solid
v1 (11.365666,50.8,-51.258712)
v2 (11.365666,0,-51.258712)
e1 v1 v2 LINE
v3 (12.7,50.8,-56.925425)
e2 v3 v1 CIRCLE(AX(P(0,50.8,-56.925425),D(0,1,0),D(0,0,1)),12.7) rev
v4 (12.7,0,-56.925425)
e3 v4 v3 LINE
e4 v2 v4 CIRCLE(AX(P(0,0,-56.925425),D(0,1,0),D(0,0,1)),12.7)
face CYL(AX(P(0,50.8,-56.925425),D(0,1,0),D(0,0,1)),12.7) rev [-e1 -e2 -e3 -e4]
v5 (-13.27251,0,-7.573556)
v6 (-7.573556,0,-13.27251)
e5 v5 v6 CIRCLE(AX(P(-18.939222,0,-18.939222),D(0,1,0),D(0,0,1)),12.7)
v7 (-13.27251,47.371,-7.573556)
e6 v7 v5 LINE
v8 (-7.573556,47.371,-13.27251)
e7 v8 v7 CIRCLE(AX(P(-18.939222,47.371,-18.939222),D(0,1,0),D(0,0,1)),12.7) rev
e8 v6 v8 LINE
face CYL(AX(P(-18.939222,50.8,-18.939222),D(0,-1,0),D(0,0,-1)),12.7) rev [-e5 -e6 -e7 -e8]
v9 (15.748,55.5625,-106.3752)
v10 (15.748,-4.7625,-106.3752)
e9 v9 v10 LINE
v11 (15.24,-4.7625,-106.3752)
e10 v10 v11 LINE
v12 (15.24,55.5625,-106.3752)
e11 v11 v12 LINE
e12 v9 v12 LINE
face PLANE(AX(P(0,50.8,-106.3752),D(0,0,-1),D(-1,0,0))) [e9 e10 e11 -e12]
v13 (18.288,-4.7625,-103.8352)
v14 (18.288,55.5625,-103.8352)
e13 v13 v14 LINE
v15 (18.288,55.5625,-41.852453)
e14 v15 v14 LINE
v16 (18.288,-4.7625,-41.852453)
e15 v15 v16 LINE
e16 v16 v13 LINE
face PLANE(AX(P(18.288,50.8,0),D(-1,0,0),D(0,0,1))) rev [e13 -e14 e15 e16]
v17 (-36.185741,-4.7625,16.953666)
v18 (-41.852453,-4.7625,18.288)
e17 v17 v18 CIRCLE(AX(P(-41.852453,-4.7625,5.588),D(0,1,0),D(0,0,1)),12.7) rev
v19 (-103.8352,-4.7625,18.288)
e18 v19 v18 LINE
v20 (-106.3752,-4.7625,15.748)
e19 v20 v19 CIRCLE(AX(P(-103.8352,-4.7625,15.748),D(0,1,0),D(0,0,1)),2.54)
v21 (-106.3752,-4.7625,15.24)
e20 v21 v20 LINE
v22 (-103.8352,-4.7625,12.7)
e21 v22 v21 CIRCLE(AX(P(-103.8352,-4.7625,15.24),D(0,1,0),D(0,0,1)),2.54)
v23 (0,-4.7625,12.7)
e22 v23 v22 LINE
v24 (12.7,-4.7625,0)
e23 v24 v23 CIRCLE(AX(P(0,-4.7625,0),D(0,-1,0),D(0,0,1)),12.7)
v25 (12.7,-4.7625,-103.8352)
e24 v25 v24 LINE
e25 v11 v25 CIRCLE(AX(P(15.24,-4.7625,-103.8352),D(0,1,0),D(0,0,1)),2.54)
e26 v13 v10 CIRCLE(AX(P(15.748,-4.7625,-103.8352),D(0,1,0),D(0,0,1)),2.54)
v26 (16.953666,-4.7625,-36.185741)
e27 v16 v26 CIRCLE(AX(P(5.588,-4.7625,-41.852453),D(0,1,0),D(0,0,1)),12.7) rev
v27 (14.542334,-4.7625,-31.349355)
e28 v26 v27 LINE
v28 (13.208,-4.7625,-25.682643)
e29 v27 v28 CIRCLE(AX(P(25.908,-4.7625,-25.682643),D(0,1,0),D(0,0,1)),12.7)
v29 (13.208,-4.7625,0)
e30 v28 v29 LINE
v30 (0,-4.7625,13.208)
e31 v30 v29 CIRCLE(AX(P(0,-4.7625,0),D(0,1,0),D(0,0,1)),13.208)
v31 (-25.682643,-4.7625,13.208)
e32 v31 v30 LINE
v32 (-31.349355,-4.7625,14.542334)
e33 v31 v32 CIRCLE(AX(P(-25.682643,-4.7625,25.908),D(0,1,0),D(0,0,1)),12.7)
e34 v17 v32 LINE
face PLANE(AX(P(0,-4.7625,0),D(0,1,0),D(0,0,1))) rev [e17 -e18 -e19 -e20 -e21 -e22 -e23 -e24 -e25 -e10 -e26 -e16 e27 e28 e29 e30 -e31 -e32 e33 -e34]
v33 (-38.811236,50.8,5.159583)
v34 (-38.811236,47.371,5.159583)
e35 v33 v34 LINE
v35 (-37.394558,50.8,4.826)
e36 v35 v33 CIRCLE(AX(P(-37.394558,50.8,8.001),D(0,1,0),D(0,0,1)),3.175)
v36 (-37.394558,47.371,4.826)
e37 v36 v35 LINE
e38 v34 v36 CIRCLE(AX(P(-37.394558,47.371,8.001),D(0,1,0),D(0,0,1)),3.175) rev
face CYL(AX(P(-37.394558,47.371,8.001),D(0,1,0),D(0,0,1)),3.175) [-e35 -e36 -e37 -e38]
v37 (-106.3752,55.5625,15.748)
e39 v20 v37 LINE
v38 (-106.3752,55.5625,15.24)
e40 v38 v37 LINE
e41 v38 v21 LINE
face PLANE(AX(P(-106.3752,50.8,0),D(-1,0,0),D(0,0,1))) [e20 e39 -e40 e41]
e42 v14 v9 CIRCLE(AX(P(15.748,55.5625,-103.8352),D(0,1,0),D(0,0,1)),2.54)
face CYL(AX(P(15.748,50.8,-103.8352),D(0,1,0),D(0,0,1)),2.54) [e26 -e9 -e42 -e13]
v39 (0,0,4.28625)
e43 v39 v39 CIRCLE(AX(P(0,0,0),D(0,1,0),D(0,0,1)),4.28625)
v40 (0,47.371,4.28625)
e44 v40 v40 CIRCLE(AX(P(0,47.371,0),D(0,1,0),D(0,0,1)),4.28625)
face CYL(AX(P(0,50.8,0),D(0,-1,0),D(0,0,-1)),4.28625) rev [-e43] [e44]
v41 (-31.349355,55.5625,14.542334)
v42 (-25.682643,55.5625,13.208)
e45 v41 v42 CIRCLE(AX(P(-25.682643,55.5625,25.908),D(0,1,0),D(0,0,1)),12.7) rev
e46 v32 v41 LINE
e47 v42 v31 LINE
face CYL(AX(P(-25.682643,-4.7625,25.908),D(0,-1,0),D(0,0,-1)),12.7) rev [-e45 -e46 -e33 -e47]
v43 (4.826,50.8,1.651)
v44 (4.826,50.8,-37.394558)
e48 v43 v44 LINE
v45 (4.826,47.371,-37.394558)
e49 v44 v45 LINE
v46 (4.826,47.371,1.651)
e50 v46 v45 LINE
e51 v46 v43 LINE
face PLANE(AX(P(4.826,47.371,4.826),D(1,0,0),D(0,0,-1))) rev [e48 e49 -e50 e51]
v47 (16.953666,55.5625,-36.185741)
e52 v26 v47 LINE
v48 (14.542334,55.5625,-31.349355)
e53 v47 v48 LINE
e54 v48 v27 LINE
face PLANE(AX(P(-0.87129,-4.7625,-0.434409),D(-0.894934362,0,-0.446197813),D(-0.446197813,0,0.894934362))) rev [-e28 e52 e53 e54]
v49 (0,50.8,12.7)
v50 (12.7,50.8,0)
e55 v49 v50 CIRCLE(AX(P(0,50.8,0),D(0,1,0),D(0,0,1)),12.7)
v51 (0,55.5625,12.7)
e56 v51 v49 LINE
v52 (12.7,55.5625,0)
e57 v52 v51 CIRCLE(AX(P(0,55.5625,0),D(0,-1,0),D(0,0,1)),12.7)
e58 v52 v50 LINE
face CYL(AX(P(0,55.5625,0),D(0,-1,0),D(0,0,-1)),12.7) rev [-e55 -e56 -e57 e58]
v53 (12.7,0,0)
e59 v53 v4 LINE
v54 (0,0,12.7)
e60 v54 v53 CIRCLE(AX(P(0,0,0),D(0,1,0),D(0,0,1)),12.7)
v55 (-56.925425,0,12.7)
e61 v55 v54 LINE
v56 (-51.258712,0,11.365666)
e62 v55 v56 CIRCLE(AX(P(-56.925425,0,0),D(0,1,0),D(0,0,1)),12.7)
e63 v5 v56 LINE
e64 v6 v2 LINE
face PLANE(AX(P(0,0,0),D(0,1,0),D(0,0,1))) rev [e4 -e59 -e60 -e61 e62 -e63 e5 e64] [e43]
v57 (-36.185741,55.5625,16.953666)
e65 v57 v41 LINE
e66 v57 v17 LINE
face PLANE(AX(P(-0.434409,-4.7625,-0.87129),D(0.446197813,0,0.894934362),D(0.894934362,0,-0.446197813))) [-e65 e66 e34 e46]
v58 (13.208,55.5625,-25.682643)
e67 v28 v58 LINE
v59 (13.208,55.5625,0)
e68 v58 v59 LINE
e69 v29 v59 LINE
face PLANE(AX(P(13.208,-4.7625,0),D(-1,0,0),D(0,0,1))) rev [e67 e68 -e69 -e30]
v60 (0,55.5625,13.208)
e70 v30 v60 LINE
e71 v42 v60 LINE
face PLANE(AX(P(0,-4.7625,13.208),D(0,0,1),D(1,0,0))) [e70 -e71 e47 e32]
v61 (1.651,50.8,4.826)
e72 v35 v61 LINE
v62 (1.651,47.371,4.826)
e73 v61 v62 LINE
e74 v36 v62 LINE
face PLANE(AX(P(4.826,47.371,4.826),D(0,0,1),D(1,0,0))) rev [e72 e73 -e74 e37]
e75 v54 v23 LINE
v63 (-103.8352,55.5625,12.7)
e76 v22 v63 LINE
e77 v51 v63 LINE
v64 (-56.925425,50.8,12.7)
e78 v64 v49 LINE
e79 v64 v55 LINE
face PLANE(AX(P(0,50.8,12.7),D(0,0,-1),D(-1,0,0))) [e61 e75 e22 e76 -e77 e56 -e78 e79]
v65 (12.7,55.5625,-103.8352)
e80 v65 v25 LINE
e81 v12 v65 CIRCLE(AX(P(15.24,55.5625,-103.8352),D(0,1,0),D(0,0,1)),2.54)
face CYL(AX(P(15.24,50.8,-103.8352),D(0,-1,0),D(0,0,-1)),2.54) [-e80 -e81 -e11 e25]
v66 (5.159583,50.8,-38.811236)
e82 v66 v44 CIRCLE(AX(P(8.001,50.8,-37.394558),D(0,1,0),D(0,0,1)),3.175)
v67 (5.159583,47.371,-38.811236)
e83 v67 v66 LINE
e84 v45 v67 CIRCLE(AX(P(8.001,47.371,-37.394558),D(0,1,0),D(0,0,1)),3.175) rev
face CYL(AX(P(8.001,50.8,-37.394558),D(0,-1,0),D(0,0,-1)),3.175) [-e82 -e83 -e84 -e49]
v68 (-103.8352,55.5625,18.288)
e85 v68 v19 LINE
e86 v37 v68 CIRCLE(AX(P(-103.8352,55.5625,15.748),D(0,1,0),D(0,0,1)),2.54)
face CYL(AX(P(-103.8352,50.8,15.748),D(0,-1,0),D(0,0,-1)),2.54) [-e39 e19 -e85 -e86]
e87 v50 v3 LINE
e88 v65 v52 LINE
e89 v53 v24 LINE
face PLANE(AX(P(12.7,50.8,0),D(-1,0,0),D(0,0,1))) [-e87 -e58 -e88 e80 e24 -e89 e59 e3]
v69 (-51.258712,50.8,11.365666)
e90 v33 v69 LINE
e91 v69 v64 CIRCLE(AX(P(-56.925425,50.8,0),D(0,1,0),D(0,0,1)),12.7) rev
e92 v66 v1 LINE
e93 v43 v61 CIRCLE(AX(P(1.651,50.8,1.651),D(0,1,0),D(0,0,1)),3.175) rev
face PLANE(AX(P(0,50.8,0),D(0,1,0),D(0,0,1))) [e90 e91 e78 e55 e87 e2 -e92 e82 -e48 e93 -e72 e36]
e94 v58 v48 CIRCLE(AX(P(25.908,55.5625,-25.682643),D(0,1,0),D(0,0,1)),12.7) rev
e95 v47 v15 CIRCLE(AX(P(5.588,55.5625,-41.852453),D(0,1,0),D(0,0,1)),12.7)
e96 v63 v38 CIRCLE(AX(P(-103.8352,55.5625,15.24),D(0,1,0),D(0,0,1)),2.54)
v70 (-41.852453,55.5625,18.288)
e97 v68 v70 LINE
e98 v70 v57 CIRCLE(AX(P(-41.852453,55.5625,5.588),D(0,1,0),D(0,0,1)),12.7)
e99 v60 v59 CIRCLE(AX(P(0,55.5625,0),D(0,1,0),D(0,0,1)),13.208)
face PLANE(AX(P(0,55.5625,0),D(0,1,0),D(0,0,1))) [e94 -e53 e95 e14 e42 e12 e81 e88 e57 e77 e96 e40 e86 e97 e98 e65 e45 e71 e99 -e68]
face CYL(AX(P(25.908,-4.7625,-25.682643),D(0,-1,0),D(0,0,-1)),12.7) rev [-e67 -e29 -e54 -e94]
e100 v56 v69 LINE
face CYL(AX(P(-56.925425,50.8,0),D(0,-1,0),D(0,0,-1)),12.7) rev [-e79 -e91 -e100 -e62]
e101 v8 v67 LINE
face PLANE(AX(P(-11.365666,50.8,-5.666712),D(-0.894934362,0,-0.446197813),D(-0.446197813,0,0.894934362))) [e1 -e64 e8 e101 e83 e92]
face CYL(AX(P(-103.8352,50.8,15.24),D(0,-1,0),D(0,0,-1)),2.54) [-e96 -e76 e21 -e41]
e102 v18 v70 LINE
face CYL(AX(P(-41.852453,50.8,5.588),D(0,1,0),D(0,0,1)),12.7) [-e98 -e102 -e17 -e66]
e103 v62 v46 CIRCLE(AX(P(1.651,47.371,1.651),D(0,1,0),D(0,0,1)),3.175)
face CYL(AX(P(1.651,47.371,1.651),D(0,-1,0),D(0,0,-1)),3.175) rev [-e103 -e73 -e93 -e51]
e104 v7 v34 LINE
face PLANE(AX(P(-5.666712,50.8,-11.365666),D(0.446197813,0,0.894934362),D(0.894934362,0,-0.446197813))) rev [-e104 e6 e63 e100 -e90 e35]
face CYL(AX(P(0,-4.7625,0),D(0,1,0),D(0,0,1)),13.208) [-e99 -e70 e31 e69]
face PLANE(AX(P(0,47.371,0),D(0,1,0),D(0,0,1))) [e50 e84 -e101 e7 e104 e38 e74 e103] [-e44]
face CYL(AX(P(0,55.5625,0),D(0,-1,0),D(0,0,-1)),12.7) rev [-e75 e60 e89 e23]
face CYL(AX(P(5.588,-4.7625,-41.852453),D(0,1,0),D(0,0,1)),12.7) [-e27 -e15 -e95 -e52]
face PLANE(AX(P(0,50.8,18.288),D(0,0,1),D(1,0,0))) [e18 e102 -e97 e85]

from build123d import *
from build123d.topology import SkipClean

# Parameters (mm, degrees)
SKETCH1_R           = 4.28625
BOSS_EXTRUDE1_DEPTH = 50.8
FILLET2_R           = 2.54
SKETCH7_W           = 42.968170869
SKETCH7_H           = 42.968170869
CUT_EXTRUDE3_DEPTH  = 3.429
FILLET9_R           = 3.175
BOSS_EXTRUDE2_DEPTH = 30.1625
CUT_EXTRUDE4_DEPTH  = 163.081683034
FILLET10_R          = 12.7


with BuildPart() as part:
    # Sketch1 → Boss-Extrude1 (new body)
    with BuildSketch(Plane(origin=(0, 0, 0), x_dir=(1, 0, 0), z_dir=(0, 1, 0))):
        with BuildLine():
            Line((-106.3752, -18.288), (0, -18.288))
            ThreePointArc((0, -18.288), (12.931568814, -12.931568814), (18.288, 0))
            Line((18.288, 0), (18.288, 106.3752))
            Line((18.288, 106.3752), (12.7, 106.3752))
            Line((12.7, 106.3752), (12.7, 53.934971632))
            Line((12.7, 53.934971632), (-9.469611004, 9.469611004))
            Line((-9.469611004, 9.469611004), (-53.934971632, -12.7))
            Line((-53.934971632, -12.7), (-106.3752, -12.7))
            Line((-106.3752, -12.7), (-106.3752, -18.288))
        make_face()
        Circle(SKETCH1_R, mode=Mode.SUBTRACT)
    extrude(amount=BOSS_EXTRUDE1_DEPTH)

    # Fillet2
    fillet2_edges = [part.edges().sort_by_distance(p)[0] for p in [
        (12.7, 25.4, -106.3752),
        (18.288, 25.4, -106.3752),
        (-106.3752, 25.4, 12.7),
        (-106.3752, 25.4, 18.288),
    ]]
    fillet(fillet2_edges, radius=FILLET2_R)

    # Sketch7 → Cut-Extrude3 (cut)
    with BuildSketch(Plane(origin=(0, 50.8, 0), x_dir=(1, 0, 0), z_dir=(0, 1, 0))):
        with Locations((-16.658085435, 16.658085435)):
            Rectangle(SKETCH7_W, SKETCH7_H)
    extrude(amount=-CUT_EXTRUDE3_DEPTH, mode=Mode.SUBTRACT)

    # Fillet9
    fillet9_edges = [part.edges().sort_by_distance(p)[0] for p in [
        (4.826, 49.0855, -38.142170869),
        (4.826, 49.0855, 4.826),
        (-38.142170869, 49.0855, 4.826),
    ]]
    fillet(fillet9_edges, radius=FILLET9_R)

    # Sketch8 → Boss-Extrude2 (add, symmetric)
    with SkipClean():  # the faces are left unmerged after this step: merging them gives an invalid solid
        with BuildSketch(Plane(origin=(0, 25.4, 0), x_dir=(1, 0, 0), z_dir=(0, 1, 0))):
            with BuildLine():
                Line((0, -12.7), (-103.8352, -12.7))
                ThreePointArc((-103.8352, -12.7), (-105.631251224, -13.443948776), (-106.3752, -15.24))
                Line((-106.3752, -15.24), (-106.3752, -15.748))
                ThreePointArc((-106.3752, -15.748), (-105.631251224, -17.544051224), (-103.8352, -18.288))
                Line((-103.8352, -18.288), (0, -18.288))
                ThreePointArc((0, -18.288), (12.931568814, -12.931568814), (18.288, 0))
                Line((18.288, 0), (18.288, 103.8352))
                ThreePointArc((18.288, 103.8352), (17.544051224, 105.631251224), (15.748, 106.3752))
                Line((15.748, 106.3752), (15.24, 106.3752))
                ThreePointArc((15.24, 106.3752), (13.443948776, 105.631251224), (12.7, 103.8352))
                Line((12.7, 103.8352), (12.7, 0))
                ThreePointArc((12.7, 0), (8.980256121, -8.980256121), (0, -12.7))
            make_face()
        extrude(amount=BOSS_EXTRUDE2_DEPTH, both=True)
    add(part.part.scale(1), mode=Mode.REPLACE)  # the faces are merged on a copy

    # Sketch9 → Cut-Extrude4 (cut, through all)
    with BuildSketch(Plane(origin=(0, 55.5625, 0), x_dir=(1, 0, 0), z_dir=(0, 1, 0))):
        with BuildLine():
            Line((-28.673096282, -13.208), (-38.862, -18.288))
            Line((-38.862, -18.288), (0, -18.288))
            ThreePointArc((0, -18.288), (12.931568814, -12.931568814), (18.288, 0))
            Line((18.288, 0), (18.288, 38.862))
            Line((18.288, 38.862), (13.208, 28.673096282))
            Line((13.208, 28.673096282), (13.208, 0))
            ThreePointArc((13.208, 0), (9.339466366, -9.339466366), (0, -13.208))
            Line((0, -13.208), (-28.673096282, -13.208))
        make_face()
    extrude(amount=-CUT_EXTRUDE4_DEPTH, mode=Mode.SUBTRACT)

    # Fillet10
    fillet10_edges = [part.edges().sort_by_distance(p)[0] for p in [
        (-38.862, 25.4, 18.288),
        (13.208, 25.4, -28.673096282),
        (18.288, 25.4, -38.862),
        (-28.673096282, 25.4, 13.208),
        (12.7, 25.4, -53.934971632),
        (-53.934971632, 25.4, 12.7),
        (-9.469611004, 23.6855, -9.469611004),
    ]]
    fillet(fillet10_edges, radius=FILLET10_R)


solid = part.part
